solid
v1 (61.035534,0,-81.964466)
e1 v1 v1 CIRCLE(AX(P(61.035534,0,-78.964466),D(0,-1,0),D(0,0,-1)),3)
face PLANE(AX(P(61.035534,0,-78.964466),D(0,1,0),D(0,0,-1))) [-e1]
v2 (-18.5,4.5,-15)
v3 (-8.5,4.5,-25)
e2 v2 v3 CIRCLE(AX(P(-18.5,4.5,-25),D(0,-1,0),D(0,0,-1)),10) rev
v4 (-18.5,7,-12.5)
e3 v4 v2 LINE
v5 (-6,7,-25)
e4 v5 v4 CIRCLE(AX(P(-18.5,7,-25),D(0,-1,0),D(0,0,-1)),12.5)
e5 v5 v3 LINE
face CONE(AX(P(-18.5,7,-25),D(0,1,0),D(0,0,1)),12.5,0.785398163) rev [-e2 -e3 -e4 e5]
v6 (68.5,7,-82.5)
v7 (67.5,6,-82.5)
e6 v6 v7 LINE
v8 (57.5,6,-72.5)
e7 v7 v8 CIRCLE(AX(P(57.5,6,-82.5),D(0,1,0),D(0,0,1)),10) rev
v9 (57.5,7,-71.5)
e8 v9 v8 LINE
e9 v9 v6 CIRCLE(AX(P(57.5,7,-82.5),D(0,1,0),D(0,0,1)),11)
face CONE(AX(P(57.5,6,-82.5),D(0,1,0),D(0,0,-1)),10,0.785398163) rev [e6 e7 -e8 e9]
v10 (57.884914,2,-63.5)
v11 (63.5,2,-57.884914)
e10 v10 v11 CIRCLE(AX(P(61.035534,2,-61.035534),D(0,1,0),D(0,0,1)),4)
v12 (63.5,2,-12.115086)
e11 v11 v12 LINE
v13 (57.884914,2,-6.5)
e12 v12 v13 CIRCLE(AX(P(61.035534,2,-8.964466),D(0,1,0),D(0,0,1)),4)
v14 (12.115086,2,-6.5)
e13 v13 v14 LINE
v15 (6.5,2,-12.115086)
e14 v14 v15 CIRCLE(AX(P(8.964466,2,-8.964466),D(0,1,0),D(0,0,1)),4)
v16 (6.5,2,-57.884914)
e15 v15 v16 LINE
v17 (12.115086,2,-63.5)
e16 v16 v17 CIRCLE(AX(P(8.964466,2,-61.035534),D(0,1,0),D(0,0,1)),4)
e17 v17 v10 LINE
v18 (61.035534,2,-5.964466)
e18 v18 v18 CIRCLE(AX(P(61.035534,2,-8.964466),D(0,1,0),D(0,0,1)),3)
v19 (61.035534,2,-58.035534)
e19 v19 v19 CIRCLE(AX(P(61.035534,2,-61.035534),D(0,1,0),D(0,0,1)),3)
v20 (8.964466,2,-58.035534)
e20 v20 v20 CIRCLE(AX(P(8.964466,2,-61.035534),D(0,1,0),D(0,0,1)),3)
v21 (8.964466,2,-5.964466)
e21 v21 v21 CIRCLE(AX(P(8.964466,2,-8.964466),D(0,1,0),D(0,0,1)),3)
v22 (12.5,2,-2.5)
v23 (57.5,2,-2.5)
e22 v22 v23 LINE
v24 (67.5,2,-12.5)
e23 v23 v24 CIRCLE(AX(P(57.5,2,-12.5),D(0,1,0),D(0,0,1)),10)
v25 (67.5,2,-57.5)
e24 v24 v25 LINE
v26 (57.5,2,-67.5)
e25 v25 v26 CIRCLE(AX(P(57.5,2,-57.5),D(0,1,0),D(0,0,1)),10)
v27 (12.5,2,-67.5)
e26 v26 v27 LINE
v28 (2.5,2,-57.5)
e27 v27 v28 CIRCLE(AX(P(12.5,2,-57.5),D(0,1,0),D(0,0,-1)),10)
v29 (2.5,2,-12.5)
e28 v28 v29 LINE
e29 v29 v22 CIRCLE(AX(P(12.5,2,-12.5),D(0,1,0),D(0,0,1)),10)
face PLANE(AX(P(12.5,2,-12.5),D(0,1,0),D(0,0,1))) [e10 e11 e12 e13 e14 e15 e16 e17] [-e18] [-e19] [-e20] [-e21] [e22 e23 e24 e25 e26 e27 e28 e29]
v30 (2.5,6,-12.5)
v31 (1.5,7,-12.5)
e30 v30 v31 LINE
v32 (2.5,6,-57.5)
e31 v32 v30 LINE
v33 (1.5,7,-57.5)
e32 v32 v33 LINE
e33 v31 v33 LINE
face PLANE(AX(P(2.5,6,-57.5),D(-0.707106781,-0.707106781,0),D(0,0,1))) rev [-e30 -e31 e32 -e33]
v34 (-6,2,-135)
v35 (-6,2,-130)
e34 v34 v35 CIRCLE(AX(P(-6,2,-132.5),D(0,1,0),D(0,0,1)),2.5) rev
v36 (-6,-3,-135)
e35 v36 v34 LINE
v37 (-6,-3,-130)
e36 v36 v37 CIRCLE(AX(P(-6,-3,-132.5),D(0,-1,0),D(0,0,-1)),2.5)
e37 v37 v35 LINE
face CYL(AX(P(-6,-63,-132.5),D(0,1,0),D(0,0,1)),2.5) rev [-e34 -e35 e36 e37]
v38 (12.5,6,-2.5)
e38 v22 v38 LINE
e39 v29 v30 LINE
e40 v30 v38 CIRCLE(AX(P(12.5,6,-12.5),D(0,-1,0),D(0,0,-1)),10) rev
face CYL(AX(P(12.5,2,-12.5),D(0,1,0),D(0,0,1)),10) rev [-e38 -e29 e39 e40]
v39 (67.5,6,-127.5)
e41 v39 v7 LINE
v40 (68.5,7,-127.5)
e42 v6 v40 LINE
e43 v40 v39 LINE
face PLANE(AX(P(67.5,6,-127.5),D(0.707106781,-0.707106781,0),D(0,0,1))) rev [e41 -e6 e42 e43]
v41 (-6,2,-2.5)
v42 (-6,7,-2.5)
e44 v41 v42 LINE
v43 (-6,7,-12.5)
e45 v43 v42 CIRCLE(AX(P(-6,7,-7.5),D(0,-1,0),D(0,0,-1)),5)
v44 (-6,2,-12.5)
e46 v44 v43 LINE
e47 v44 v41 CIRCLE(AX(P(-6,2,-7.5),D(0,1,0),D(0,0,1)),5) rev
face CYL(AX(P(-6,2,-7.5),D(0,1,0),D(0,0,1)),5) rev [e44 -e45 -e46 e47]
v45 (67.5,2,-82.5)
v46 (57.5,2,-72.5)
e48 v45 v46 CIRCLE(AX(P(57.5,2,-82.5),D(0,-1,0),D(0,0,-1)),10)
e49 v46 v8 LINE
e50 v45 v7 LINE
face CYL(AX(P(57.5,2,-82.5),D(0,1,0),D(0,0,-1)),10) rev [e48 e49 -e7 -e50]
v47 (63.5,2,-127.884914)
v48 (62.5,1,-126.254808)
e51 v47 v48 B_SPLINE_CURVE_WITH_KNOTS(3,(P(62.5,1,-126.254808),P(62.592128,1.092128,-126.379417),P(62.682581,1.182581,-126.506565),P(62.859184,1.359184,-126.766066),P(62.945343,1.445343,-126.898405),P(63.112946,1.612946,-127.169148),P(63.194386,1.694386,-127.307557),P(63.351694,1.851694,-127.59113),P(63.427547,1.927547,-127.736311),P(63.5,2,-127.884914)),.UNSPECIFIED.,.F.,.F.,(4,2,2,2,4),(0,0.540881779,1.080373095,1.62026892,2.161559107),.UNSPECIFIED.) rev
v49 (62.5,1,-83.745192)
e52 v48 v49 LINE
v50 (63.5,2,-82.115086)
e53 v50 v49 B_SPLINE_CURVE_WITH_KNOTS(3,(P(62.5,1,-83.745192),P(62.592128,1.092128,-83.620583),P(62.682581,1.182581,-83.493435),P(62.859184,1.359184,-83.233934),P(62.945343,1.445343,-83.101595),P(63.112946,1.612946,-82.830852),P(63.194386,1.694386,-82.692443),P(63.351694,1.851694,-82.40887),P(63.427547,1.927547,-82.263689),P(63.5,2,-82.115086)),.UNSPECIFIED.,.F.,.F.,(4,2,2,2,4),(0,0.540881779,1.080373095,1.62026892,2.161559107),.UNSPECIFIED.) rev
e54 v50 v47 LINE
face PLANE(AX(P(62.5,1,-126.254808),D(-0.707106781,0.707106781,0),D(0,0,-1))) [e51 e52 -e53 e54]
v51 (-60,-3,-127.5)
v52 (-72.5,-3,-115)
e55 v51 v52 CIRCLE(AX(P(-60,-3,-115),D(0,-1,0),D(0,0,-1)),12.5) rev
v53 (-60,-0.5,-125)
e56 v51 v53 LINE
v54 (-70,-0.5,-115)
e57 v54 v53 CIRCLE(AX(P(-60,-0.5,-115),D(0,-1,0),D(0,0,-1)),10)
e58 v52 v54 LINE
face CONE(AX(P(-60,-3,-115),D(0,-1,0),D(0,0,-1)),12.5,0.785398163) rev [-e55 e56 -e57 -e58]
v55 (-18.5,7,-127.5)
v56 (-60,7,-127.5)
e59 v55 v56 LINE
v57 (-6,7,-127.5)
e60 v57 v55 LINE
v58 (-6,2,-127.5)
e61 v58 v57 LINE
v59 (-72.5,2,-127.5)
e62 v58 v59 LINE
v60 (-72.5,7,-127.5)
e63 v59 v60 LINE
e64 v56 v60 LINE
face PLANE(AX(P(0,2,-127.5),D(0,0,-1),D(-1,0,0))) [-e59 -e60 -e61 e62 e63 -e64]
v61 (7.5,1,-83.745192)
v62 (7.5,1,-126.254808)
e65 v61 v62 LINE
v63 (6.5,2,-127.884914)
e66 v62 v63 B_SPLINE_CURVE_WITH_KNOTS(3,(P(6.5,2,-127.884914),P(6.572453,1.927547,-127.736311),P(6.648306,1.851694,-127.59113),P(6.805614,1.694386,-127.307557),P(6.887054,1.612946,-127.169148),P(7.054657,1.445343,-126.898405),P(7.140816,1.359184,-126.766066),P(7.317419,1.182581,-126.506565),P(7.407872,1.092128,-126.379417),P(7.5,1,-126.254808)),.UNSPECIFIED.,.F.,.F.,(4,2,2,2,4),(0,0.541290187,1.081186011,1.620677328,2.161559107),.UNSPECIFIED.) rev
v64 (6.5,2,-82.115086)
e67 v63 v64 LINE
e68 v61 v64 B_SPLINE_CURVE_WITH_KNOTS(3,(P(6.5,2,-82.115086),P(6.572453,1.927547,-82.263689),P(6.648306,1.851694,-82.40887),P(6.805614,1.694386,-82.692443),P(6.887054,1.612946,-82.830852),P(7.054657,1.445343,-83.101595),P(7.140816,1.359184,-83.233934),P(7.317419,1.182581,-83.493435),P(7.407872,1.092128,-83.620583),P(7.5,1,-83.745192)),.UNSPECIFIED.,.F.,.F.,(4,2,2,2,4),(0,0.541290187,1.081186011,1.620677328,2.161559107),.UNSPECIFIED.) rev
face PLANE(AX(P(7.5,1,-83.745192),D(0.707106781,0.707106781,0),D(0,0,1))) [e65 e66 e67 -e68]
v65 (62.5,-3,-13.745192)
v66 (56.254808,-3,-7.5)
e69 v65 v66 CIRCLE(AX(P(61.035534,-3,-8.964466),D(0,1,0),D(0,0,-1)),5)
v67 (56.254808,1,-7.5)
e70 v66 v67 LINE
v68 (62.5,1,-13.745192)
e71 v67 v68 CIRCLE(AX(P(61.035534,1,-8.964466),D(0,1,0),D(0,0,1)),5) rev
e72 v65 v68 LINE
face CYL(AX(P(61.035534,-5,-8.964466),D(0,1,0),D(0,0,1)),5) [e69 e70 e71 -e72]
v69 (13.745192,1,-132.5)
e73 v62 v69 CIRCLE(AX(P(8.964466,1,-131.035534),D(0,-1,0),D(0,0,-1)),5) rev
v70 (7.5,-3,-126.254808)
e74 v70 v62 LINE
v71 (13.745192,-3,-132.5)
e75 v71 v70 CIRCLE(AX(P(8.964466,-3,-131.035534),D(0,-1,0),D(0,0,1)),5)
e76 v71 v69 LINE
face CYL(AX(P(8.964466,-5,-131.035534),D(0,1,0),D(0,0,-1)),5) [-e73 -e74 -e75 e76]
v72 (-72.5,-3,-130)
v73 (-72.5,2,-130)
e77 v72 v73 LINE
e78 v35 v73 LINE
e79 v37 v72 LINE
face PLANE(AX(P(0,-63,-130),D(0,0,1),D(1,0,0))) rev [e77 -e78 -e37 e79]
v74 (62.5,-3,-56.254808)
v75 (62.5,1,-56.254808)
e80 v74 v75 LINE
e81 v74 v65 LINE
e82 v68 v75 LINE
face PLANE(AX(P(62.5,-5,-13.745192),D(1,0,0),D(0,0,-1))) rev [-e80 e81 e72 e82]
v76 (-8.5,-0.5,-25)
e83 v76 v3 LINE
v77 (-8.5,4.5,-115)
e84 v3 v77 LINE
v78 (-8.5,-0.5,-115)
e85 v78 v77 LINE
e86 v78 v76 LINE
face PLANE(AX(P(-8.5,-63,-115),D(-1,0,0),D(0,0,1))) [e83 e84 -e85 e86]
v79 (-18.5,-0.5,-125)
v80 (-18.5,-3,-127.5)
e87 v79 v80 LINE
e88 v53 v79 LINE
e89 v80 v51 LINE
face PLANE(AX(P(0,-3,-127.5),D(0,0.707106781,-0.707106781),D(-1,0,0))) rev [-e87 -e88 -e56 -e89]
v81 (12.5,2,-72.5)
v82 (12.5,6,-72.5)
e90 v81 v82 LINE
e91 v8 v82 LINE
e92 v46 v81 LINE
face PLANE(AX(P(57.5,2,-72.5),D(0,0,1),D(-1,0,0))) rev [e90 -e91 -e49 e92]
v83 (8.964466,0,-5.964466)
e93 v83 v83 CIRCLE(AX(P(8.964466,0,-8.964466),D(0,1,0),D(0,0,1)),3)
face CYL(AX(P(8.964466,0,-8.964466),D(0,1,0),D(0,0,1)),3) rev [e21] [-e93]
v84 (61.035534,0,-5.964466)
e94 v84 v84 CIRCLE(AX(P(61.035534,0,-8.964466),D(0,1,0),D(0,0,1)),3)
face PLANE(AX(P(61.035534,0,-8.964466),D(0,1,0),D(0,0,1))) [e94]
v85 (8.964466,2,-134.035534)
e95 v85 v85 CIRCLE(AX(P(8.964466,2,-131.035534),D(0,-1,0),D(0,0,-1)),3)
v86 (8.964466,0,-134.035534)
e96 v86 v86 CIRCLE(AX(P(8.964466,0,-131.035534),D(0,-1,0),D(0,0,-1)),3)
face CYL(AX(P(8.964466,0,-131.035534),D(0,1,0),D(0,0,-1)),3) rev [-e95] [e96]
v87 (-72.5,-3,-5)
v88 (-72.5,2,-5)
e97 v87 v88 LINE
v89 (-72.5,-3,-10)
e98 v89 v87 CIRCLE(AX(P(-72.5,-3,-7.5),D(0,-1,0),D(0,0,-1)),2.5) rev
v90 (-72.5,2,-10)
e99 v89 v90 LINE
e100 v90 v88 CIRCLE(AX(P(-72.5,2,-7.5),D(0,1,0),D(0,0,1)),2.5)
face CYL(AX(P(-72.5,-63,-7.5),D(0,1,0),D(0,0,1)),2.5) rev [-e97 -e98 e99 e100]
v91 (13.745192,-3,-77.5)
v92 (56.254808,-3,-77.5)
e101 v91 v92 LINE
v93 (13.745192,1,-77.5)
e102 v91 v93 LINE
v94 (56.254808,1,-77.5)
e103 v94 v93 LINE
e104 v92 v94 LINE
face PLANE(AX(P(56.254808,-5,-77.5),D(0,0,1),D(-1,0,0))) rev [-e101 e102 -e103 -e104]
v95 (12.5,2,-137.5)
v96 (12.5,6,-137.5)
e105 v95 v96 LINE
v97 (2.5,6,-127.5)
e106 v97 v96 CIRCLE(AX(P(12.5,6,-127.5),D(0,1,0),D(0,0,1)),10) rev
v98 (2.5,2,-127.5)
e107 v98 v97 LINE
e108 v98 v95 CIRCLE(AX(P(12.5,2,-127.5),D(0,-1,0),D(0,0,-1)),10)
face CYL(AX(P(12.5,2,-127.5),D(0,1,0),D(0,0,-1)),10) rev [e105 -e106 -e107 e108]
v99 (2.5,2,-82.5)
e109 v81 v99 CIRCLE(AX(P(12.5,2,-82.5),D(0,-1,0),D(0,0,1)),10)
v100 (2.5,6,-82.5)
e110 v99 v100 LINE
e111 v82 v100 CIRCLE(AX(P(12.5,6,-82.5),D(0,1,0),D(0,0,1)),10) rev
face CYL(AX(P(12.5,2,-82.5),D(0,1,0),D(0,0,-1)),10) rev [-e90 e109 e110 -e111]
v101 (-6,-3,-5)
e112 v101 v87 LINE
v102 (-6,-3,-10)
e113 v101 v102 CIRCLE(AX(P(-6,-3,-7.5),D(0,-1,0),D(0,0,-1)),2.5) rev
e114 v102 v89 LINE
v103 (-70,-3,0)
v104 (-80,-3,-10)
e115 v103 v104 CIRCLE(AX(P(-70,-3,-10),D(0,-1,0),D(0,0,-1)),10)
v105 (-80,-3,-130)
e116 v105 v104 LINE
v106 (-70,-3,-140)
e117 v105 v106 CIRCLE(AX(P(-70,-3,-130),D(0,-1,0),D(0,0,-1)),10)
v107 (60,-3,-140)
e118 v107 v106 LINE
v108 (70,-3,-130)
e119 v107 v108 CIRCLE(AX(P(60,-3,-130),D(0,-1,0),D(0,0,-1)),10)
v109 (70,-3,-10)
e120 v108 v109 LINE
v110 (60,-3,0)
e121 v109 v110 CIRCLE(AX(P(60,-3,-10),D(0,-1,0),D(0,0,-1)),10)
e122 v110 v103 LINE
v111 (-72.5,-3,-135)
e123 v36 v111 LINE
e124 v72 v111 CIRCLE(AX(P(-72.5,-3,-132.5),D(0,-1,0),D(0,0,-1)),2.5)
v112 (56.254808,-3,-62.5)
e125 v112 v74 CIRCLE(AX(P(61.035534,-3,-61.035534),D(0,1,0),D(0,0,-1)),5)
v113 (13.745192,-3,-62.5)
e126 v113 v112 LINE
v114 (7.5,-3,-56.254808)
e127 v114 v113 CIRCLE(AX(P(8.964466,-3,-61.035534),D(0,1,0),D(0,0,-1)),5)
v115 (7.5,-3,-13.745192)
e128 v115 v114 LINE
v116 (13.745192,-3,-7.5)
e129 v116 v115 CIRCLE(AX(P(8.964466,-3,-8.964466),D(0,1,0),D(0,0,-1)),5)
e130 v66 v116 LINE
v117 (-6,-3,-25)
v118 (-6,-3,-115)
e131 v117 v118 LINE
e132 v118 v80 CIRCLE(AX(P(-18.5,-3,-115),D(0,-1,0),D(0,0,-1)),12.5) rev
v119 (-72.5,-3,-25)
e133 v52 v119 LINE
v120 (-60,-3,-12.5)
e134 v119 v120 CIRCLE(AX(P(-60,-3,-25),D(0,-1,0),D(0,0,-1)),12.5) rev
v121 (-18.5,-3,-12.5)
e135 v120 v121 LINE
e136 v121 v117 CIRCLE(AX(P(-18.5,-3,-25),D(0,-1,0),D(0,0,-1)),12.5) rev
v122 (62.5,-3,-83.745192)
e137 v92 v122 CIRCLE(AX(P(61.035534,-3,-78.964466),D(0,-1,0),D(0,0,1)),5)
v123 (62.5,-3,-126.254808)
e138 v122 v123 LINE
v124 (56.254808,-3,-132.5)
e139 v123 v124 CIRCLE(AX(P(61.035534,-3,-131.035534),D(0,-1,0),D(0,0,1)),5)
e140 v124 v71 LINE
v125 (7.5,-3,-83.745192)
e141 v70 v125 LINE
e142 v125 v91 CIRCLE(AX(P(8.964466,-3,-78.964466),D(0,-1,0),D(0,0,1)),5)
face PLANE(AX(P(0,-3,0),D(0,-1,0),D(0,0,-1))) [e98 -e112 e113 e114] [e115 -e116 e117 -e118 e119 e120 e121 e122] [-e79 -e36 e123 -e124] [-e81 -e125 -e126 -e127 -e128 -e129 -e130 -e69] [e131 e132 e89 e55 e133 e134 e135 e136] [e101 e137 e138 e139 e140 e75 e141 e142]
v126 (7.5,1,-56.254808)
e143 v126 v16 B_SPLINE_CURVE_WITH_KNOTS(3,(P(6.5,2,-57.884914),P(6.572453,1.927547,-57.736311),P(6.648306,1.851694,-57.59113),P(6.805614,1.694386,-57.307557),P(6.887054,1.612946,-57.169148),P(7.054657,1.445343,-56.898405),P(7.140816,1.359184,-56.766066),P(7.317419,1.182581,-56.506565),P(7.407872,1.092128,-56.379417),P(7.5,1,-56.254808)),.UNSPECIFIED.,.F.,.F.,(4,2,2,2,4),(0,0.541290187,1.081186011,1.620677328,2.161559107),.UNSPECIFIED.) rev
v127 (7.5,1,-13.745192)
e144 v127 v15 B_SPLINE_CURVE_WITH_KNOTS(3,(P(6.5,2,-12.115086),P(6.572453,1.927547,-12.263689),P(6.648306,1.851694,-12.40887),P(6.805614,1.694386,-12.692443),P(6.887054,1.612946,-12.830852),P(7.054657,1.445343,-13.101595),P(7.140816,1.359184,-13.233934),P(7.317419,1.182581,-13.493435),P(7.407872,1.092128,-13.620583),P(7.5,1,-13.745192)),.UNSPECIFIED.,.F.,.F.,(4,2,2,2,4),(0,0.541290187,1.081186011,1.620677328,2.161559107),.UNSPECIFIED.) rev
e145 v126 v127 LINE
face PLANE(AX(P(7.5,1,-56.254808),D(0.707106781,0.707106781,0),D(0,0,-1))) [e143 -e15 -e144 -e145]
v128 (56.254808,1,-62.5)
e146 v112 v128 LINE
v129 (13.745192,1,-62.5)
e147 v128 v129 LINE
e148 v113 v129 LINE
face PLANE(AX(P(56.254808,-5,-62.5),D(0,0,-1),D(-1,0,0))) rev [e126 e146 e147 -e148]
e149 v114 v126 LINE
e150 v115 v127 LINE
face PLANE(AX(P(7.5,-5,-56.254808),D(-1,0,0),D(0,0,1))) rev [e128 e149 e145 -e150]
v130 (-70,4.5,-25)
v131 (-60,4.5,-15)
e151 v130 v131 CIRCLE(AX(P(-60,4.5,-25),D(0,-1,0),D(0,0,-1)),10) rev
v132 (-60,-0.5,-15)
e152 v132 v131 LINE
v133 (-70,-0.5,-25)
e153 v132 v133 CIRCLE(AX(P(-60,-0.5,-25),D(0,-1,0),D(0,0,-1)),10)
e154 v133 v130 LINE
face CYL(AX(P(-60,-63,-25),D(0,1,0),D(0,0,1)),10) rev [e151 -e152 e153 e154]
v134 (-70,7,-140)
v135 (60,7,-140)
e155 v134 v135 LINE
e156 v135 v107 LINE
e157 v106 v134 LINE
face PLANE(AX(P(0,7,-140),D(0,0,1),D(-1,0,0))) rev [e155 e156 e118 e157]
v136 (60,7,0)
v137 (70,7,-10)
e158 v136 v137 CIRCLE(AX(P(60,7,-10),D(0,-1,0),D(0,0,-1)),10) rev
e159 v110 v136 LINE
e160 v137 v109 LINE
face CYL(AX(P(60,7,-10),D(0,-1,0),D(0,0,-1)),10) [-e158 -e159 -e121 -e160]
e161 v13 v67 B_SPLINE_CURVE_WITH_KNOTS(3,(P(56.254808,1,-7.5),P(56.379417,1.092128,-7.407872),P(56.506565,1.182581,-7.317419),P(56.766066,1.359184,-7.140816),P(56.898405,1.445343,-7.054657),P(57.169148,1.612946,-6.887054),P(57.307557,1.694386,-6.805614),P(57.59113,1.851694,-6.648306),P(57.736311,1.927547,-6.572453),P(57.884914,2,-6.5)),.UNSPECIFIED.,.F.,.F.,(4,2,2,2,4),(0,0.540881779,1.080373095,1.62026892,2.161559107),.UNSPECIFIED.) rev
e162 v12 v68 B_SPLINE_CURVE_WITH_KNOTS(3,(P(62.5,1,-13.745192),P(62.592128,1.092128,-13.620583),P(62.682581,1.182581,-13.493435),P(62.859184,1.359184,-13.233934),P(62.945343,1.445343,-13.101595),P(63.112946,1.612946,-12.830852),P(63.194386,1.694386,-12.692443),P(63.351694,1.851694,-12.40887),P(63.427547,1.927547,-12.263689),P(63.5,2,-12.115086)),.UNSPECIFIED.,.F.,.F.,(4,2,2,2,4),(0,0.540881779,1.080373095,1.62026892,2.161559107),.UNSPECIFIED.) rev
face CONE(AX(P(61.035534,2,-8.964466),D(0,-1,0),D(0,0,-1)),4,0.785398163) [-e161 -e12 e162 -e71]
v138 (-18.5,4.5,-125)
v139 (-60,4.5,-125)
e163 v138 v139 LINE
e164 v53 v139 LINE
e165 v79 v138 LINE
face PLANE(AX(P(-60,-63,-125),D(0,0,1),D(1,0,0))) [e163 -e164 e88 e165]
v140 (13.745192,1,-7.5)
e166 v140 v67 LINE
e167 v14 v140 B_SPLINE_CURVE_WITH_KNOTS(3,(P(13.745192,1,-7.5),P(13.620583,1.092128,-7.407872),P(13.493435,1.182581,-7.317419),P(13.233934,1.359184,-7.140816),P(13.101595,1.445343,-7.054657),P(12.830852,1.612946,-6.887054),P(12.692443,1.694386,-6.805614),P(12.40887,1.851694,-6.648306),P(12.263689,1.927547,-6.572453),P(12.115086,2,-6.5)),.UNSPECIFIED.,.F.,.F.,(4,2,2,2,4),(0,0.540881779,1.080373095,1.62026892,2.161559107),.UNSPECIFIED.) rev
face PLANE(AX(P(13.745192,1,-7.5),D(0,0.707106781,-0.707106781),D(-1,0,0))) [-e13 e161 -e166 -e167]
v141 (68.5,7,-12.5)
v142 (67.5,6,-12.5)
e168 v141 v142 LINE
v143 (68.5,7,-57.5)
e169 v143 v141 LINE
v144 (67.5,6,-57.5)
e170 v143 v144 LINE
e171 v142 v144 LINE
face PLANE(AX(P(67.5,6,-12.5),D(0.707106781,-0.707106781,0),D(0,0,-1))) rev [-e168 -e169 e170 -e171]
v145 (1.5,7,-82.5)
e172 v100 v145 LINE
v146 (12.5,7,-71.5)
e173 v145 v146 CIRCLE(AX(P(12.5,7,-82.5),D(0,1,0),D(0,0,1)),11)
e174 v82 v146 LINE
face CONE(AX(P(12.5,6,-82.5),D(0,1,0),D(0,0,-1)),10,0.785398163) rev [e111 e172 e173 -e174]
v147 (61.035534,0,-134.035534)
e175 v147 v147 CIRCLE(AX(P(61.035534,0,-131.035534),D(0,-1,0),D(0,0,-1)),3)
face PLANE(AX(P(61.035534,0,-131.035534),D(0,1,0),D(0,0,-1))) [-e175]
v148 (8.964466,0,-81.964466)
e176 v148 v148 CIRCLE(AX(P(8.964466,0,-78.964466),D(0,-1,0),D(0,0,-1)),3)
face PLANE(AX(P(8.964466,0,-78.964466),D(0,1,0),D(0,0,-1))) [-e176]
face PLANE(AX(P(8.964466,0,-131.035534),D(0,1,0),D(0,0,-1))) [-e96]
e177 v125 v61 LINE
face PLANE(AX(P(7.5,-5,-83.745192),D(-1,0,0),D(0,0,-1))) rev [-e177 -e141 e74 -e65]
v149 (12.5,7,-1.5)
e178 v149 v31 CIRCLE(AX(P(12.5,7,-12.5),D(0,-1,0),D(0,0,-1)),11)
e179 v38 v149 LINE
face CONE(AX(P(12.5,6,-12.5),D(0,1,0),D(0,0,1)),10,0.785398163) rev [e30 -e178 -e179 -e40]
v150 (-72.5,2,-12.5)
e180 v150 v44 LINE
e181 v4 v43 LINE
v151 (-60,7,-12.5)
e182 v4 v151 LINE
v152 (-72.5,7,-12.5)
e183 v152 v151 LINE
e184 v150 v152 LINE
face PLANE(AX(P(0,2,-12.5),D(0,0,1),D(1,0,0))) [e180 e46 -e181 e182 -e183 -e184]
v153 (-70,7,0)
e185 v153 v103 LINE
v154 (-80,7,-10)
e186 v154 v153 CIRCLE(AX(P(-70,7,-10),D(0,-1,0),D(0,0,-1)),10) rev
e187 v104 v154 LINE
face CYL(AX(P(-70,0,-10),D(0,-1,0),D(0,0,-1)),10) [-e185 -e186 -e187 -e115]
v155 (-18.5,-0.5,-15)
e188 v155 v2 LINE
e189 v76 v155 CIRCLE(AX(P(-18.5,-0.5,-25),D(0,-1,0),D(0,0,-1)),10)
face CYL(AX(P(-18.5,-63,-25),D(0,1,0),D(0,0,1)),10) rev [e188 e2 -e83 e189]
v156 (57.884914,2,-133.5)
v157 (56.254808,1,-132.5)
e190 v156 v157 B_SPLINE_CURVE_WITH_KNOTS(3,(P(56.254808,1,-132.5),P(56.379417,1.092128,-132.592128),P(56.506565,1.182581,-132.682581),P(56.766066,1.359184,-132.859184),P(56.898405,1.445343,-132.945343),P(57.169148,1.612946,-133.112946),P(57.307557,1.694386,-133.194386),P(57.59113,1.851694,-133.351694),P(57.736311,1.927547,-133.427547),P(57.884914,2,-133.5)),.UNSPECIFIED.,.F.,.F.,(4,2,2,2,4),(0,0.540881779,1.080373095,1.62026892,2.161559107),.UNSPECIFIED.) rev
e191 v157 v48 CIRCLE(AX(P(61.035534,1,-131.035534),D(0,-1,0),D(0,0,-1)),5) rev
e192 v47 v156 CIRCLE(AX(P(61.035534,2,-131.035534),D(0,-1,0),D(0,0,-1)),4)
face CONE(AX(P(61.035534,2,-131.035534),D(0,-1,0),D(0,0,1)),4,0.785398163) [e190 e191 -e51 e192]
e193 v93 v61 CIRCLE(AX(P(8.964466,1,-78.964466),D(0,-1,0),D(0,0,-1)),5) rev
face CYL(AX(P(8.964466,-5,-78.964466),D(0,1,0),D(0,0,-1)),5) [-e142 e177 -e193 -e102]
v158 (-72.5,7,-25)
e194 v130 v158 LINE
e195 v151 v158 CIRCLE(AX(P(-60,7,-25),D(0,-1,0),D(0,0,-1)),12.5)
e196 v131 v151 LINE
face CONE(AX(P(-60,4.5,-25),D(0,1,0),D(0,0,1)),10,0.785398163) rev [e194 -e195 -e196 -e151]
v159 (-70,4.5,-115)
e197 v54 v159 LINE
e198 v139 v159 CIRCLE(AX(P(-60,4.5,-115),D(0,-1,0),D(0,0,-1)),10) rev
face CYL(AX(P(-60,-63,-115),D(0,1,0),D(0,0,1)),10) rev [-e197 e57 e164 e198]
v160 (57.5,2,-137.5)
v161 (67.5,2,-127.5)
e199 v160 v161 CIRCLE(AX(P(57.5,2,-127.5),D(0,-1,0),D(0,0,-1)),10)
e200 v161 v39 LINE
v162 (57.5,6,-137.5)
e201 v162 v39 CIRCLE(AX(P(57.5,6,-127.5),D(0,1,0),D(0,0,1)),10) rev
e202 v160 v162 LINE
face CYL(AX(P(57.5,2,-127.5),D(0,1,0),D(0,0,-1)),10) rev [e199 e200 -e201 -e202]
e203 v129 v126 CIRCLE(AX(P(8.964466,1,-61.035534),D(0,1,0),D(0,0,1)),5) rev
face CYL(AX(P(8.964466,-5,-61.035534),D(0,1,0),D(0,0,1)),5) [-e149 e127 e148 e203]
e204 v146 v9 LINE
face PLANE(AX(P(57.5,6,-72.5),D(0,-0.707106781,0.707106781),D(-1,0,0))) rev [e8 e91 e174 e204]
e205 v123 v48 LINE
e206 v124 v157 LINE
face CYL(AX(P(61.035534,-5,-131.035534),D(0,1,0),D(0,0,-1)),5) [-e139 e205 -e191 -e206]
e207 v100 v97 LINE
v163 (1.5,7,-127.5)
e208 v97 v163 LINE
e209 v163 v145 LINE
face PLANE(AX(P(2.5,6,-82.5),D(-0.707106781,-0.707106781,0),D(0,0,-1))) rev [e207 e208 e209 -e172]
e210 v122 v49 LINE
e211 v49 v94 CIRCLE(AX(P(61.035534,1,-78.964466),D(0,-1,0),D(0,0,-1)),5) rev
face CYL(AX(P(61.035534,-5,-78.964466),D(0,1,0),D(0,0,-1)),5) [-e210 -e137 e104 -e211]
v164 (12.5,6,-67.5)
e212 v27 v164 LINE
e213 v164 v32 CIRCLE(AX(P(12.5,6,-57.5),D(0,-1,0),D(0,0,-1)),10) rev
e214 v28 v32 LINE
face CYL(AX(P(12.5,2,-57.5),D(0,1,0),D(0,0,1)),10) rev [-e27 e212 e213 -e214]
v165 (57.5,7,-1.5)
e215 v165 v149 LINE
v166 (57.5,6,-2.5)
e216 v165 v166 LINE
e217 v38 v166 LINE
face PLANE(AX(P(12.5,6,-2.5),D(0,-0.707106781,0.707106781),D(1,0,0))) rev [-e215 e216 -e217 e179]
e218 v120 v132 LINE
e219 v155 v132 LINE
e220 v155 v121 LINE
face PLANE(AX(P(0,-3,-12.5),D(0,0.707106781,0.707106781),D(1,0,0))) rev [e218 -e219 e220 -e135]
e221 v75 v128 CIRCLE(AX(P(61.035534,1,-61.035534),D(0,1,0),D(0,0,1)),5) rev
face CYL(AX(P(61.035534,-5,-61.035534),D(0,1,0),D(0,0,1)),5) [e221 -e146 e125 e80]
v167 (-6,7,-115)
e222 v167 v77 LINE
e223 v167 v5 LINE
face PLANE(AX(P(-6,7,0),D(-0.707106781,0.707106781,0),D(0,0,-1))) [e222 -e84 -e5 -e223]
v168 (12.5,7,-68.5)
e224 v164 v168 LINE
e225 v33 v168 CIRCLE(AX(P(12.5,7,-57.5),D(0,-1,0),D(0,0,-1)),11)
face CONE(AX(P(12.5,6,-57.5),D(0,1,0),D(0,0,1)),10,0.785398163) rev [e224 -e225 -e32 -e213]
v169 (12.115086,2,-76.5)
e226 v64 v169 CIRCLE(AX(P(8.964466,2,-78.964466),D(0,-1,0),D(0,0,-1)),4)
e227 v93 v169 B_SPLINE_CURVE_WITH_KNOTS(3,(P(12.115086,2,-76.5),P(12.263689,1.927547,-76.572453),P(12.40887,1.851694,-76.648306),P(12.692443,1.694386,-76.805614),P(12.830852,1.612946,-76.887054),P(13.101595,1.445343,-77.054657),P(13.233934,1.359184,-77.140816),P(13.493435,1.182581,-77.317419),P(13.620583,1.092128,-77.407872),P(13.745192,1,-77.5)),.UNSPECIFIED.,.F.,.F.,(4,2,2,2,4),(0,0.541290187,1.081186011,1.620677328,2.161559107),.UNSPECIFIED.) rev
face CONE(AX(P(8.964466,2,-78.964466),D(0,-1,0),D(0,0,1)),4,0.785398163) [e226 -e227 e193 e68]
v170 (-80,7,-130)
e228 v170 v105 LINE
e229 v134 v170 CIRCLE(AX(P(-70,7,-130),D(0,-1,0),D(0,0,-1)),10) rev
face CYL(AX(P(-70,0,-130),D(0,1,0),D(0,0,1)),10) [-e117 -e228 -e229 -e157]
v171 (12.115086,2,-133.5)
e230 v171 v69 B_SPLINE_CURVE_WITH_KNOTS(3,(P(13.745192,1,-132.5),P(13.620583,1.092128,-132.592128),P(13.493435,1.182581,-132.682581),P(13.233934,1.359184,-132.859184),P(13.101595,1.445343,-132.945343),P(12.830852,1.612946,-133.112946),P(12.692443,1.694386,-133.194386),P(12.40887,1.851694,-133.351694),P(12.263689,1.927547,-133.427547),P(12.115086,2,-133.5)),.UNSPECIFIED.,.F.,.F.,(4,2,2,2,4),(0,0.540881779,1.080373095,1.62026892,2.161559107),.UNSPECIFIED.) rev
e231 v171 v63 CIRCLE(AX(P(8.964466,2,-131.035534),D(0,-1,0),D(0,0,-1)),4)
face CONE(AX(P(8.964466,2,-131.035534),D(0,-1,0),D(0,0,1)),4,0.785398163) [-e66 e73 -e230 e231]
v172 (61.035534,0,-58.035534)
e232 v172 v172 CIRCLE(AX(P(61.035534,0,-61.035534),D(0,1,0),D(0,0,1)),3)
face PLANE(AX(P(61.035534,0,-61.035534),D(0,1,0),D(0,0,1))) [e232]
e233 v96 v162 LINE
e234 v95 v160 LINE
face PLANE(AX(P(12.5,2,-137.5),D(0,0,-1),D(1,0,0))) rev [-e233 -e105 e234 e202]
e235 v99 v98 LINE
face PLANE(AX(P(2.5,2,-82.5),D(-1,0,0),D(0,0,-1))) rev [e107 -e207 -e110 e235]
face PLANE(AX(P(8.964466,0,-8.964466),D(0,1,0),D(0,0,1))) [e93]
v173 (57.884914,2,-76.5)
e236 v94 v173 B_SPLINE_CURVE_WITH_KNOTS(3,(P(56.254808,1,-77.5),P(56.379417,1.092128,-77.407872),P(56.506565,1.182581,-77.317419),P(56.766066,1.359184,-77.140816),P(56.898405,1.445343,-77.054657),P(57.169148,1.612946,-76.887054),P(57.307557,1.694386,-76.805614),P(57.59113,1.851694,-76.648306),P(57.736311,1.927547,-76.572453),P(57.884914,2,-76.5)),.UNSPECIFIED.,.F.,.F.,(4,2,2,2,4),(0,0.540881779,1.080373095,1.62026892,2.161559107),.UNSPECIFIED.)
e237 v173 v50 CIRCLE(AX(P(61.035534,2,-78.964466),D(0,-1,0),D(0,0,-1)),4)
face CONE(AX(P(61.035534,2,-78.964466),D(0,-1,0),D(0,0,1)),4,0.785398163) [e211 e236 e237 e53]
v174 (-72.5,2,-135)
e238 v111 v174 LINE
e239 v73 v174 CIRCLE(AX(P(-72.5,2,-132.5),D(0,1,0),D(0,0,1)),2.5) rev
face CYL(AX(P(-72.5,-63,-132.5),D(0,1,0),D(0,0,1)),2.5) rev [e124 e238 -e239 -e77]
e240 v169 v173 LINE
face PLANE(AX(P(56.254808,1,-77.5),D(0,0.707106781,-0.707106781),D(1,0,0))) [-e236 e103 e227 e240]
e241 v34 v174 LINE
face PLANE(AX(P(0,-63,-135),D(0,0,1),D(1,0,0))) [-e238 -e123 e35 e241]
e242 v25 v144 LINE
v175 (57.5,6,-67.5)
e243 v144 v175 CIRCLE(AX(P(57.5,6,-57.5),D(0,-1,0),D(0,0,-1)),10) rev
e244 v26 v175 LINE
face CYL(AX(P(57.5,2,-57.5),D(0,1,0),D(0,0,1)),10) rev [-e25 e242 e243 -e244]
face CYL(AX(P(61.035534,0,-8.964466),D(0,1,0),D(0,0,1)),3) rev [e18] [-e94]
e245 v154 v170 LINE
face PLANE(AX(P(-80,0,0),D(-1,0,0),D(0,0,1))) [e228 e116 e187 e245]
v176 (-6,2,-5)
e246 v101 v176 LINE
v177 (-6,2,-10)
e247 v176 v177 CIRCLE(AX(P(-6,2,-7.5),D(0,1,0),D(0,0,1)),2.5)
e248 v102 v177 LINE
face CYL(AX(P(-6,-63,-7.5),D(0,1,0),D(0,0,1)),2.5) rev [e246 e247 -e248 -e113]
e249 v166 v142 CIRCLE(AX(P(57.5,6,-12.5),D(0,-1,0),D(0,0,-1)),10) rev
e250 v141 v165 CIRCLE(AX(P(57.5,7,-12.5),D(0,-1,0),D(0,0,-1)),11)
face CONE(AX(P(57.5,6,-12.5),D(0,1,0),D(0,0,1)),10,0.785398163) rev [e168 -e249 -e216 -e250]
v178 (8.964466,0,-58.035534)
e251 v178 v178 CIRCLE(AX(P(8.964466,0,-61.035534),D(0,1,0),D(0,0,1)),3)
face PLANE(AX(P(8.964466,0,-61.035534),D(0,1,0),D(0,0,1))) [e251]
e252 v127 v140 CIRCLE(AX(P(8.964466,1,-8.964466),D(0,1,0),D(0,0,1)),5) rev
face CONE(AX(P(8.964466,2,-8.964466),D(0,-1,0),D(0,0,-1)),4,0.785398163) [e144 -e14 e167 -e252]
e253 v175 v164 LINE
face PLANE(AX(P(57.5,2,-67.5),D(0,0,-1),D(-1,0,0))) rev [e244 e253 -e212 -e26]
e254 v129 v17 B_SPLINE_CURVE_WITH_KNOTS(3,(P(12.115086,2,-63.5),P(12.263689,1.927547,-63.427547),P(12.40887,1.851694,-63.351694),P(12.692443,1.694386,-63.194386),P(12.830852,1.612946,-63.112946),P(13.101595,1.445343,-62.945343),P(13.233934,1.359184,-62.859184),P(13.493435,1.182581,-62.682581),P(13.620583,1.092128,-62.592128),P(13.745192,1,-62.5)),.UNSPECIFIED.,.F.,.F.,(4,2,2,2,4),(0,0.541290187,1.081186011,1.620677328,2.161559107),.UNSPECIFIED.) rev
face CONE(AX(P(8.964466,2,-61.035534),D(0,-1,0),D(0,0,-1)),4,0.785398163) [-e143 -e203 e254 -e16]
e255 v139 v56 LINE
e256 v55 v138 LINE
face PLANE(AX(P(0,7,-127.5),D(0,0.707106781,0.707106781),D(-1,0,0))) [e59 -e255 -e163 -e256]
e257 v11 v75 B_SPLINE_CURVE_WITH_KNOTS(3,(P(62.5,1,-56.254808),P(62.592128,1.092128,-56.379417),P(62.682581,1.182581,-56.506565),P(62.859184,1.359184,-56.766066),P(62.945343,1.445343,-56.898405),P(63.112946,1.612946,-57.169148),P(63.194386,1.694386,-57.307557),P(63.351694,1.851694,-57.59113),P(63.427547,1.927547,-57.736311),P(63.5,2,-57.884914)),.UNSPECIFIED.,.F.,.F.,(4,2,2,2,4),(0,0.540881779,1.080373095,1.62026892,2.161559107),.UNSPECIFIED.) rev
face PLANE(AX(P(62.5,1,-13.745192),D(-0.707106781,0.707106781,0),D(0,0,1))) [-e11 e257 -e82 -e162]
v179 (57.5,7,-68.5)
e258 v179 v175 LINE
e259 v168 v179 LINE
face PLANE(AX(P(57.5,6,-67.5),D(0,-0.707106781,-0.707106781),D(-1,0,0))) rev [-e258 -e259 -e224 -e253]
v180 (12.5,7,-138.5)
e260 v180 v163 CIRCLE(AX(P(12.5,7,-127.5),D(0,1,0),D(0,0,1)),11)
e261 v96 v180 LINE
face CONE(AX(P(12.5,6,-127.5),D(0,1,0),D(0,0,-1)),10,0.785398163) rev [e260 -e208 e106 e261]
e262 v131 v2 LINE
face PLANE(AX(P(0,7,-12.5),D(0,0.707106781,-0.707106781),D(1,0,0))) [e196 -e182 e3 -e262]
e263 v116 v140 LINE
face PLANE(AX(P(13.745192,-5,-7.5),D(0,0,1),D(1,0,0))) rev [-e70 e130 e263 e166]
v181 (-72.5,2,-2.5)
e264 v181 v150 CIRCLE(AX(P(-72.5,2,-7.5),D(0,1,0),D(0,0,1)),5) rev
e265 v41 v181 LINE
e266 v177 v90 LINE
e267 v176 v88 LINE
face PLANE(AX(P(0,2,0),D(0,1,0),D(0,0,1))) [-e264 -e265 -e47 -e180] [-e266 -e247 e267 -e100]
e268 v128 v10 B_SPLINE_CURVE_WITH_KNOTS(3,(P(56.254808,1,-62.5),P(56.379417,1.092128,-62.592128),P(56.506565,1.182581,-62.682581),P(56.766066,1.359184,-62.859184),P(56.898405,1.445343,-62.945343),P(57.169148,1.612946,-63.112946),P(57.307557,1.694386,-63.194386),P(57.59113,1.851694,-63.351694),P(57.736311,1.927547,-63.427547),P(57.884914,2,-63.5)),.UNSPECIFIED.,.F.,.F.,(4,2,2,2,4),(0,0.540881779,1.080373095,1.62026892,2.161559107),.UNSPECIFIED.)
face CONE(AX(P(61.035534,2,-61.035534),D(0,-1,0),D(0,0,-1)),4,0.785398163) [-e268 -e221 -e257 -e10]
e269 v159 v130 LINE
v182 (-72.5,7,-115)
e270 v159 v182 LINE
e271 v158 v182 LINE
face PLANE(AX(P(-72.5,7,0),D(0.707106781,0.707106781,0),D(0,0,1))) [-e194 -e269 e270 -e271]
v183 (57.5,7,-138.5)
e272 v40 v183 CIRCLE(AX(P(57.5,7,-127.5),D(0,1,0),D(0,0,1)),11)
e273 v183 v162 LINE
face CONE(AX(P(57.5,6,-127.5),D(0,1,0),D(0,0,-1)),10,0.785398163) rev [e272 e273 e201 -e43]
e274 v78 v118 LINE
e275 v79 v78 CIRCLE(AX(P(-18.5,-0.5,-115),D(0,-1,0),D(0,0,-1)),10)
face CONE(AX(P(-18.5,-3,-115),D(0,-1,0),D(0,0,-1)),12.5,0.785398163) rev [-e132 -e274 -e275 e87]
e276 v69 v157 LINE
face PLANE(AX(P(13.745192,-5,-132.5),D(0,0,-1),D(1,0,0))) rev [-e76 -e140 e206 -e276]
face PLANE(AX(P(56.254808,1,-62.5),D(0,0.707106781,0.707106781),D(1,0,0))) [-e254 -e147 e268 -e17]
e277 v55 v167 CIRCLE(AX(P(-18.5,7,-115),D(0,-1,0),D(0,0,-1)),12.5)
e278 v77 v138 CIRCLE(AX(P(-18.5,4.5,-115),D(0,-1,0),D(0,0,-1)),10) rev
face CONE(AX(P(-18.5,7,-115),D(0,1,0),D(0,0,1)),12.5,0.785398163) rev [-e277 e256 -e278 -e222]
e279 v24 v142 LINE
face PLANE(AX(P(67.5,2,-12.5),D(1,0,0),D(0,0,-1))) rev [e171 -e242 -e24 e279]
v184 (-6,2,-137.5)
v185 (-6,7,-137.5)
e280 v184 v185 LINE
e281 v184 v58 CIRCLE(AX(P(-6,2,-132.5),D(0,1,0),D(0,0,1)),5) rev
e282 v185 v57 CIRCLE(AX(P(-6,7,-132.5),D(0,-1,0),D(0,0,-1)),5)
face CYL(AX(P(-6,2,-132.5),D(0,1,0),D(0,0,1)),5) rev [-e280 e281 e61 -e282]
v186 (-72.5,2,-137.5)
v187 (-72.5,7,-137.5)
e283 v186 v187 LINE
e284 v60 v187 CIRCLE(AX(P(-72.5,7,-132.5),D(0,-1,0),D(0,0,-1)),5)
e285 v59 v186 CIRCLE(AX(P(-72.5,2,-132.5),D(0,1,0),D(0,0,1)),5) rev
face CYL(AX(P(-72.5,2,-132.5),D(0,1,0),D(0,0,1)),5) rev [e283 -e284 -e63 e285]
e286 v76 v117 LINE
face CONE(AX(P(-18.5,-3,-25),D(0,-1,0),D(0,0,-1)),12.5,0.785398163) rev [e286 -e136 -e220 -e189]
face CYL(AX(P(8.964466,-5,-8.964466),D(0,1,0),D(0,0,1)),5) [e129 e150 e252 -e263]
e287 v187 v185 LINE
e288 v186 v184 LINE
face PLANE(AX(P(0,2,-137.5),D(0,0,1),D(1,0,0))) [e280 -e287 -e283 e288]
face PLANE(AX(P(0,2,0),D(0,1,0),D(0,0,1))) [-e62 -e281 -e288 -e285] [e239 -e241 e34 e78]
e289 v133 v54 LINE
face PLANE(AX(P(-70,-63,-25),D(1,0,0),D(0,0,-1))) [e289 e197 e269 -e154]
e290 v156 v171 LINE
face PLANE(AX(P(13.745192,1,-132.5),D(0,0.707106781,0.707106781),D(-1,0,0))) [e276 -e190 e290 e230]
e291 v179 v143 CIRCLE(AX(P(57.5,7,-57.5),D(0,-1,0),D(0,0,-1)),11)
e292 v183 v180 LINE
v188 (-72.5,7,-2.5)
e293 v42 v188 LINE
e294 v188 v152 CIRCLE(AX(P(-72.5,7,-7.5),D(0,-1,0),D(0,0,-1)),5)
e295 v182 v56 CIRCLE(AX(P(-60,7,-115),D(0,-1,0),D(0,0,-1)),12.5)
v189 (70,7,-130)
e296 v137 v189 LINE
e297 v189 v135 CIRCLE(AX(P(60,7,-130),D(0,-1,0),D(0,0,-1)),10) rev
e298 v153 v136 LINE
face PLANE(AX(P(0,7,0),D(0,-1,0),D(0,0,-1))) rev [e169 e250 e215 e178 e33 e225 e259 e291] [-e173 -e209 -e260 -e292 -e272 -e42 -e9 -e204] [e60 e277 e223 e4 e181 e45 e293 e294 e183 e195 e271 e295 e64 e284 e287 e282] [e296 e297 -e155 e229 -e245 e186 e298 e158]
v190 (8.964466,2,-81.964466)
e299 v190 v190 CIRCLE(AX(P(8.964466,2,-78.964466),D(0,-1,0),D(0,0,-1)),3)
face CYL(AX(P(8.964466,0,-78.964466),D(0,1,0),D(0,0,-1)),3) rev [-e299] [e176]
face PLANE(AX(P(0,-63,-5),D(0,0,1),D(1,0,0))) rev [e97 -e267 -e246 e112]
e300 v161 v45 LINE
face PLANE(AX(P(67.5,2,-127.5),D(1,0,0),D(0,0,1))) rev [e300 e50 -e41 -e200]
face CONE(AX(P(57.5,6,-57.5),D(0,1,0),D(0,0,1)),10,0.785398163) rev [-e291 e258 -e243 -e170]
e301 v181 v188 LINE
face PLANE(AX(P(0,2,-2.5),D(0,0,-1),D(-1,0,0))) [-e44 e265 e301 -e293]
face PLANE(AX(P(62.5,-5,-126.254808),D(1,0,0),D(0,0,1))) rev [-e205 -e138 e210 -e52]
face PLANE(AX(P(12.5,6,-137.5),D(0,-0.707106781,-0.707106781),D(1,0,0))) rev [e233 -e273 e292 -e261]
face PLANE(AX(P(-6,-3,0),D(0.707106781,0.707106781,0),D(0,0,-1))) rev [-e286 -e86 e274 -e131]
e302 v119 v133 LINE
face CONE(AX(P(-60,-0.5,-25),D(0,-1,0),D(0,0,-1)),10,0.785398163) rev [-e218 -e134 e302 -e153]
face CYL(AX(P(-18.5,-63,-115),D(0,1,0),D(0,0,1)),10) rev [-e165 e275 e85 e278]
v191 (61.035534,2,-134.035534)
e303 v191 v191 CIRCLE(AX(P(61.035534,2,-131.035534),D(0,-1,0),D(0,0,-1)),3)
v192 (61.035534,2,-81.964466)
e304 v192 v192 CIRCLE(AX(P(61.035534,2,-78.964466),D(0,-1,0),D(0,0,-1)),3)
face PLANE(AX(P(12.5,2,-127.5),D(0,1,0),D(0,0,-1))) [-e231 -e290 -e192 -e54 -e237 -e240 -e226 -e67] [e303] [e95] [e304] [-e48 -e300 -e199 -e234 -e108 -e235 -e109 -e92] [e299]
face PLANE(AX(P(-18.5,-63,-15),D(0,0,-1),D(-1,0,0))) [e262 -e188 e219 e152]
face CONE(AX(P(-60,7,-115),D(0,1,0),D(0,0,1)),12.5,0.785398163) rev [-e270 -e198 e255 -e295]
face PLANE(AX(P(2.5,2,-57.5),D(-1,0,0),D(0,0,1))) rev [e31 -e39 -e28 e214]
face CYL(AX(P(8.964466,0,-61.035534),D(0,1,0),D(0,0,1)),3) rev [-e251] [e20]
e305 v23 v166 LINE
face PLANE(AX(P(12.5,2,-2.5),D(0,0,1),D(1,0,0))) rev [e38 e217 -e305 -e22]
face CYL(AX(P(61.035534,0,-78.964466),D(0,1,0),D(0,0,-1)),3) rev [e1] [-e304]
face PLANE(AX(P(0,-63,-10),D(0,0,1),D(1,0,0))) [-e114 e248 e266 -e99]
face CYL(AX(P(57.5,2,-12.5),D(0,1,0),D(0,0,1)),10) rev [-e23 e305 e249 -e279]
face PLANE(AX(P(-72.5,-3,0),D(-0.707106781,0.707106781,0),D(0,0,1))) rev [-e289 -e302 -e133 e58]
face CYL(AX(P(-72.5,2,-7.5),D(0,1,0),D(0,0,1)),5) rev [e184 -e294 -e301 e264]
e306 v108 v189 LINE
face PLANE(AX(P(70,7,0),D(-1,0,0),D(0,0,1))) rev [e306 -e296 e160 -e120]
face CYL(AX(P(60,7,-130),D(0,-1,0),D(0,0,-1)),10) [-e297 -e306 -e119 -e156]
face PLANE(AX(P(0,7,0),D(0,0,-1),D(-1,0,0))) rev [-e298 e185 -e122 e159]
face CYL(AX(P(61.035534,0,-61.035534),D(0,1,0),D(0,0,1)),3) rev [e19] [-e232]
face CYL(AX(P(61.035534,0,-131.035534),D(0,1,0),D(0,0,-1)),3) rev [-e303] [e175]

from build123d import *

# Parameters (mm, degrees)
SKETCH1_W           = 70
SKETCH1_H           = 70
BOSS_EXTRUDE2_DEPTH = 7
CUT_EXTRUDE1_DEPTH  = 5
SKETCH9_W           = 70
SKETCH9_H           = 70
BOSS_EXTRUDE3_DEPTH = 5
CUT_EXTRUDE11_DEPTH = 100.242128151
SKETCH21_R          = 3
CUT_EXTRUDE12_DEPTH = 2
CHAMFER3_SIZE       = 1
CUT_EXTRUDE13_START = -2
SKETCH22_W          = 70
SKETCH22_H          = 70
CUT_EXTRUDE13_DEPTH = 2
FILLET1_R           = 10
SKETCH23_W          = 140
SKETCH23_H          = 10
BOSS_EXTRUDE4_DEPTH = 80
CUT_EXTRUDE14_DEPTH = 70
FILLET2_R           = 10
CUT_EXTRUDE15_DEPTH = 70
CHAMFER5_SIZE       = 2.5
CUT_EXTRUDE16_DEPTH = 5
CUT_EXTRUDE17_DEPTH = 5


with BuildPart() as part:
    # Sketch1 → Boss-Extrude2 (new body)
    with BuildSketch(Plane(origin=(0, 0, 0), x_dir=(1, 0, 0), z_dir=(0, 1, 0))):
        with Locations((35, 35)):
            Rectangle(SKETCH1_W, SKETCH1_H)
    extrude(amount=BOSS_EXTRUDE2_DEPTH)

    # Sketch3 → Cut-Extrude1 (cut)
    with BuildSketch(Plane(origin=(0, 7, 0), x_dir=(1, 0, 0), z_dir=(0, 1, 0))):
        with BuildLine():
            Line((2.5, 57.5), (2.5, 12.5))
            ThreePointArc((2.5, 12.5), (5.428932188, 5.428932188), (12.5, 2.5))
            Line((12.5, 2.5), (57.5, 2.5))
            ThreePointArc((57.5, 2.5), (64.571067812, 5.428932188), (67.5, 12.5))
            Line((67.5, 12.5), (67.5, 57.5))
            ThreePointArc((67.5, 57.5), (64.571067812, 64.571067812), (57.5, 67.5))
            Line((57.5, 67.5), (12.5, 67.5))
            ThreePointArc((12.5, 67.5), (5.428932188, 64.571067812), (2.5, 57.5))
        make_face()
    extrude(amount=-CUT_EXTRUDE1_DEPTH, mode=Mode.SUBTRACT)

    # Sketch9 → Boss-Extrude3 (add)
    with BuildSketch(Plane.XZ):
        with Locations((35, -35)):
            Rectangle(SKETCH9_W, SKETCH9_H)
    extrude(amount=BOSS_EXTRUDE3_DEPTH)

    # Sketch20 → Cut-Extrude11 (cut, through all)
    with BuildSketch(Plane(origin=(0, 2, 0), x_dir=(1, 0, 0), z_dir=(0, 1, 0))):
        with BuildLine():
            Line((13.745191882, 7.5), (56.254808118, 7.5))
            ThreePointArc((56.254808118, 7.5), (57.5, 12.5), (62.5, 13.745191882))
            Line((62.5, 13.745191882), (62.5, 56.254808118))
            ThreePointArc((62.5, 56.254808118), (57.5, 57.5), (56.254808118, 62.5))
            Line((56.254808118, 62.5), (13.745191882, 62.5))
            ThreePointArc((13.745191882, 62.5), (12.5, 57.5), (7.5, 56.254808118))
            Line((7.5, 56.254808118), (7.5, 13.745191882))
            ThreePointArc((7.5, 13.745191882), (12.5, 12.5), (13.745191882, 7.5))
        make_face()
    extrude(amount=-CUT_EXTRUDE11_DEPTH, mode=Mode.SUBTRACT)

    # Sketch21 → Cut-Extrude12 (cut)
    with BuildSketch(Plane(origin=(0, 2, 0), x_dir=(1, 0, 0), z_dir=(0, 1, 0))):
        with Locations(Location((8.964466094, 61.035533906, 0), (0, 0, 270))):
            Circle(SKETCH21_R)
        with Locations(Location((61.035533906, 61.035533906, 0), (0, 0, 270))):
            Circle(SKETCH21_R)
        with Locations(Location((61.035533906, 8.964466094, 0), (0, 0, 270))):
            Circle(SKETCH21_R)
        with Locations(Location((8.964466094, 8.964466094, 0), (0, 0, 270))):
            Circle(SKETCH21_R)
    extrude(amount=-CUT_EXTRUDE12_DEPTH, mode=Mode.SUBTRACT)

    # Chamfer3
    chamfer3_edges = [part.edges().sort_by_distance(p)[0] for p in [
        (5.428932188, 7, -5.428932188),
        (35, 7, -2.5),
        (64.571067812, 7, -5.428932188),
        (67.5, 7, -35),
        (64.571067812, 7, -64.571067812),
        (35, 7, -67.5),
        (5.428932188, 7, -64.571067812),
        (2.5, 7, -35),
        (12.5, 2, -12.5),
        (12.5, 2, -57.5),
        (57.5, 2, -57.5),
        (57.5, 2, -12.5),
        (35, 2, -7.5),
        (62.5, 2, -35),
        (35, 2, -62.5),
        (7.5, 2, -35),
    ]]
    chamfer(chamfer3_edges, length=CHAMFER3_SIZE)

    # Sketch22 → Cut-Extrude13 (cut)
    with BuildSketch(Plane.XZ.offset(5).offset(CUT_EXTRUDE13_START)):
        with Locations((35, -35)):
            Rectangle(SKETCH22_W, SKETCH22_H)
        with BuildLine():
            Line((7.5, -13.745191882), (7.5, -56.254808118))
            ThreePointArc((7.5, -56.254808118), (12.5, -57.5), (13.745191882, -62.5))
            Line((13.745191882, -62.5), (56.254808118, -62.5))
            ThreePointArc((56.254808118, -62.5), (57.5, -57.5), (62.5, -56.254808118))
            Line((62.5, -56.254808118), (62.5, -13.745191882))
            ThreePointArc((62.5, -13.745191882), (57.5, -12.5), (56.254808118, -7.5))
            Line((56.254808118, -7.5), (13.745191882, -7.5))
            ThreePointArc((13.745191882, -7.5), (12.5, -12.5), (7.5, -13.745191882))
        make_face(mode=Mode.SUBTRACT)
    extrude(amount=CUT_EXTRUDE13_DEPTH, mode=Mode.SUBTRACT)

    # Mirror2: part across plane


with BuildPart() as part_1:
    add(part.part)
    add(part.part.mirror(Plane(origin=(0, 7, -70), x_dir=(1, 0, 0), z_dir=(0, 0, 1))))

    # Fillet1
    fillet1_edges = [part_1.edges().sort_by_distance(p)[0] for p in [
        (70, 2, -140),
        (70, 2, 0),
    ]]
    fillet(fillet1_edges, radius=FILLET1_R)

    # Sketch23 → Boss-Extrude4 (add)
    with BuildSketch(Plane.ZY):
        with Locations((-70, 2)):
            Rectangle(SKETCH23_W, SKETCH23_H)
    extrude(amount=BOSS_EXTRUDE4_DEPTH)

    # Sketch24 → Cut-Extrude14 (cut)
    with BuildSketch(Plane(origin=(0, 7, 0), x_dir=(1, 0, 0), z_dir=(0, 1, 0))):
        with BuildLine():
            Line((-72.5, 5), (-6, 5))
            ThreePointArc((-6, 5), (-3.5, 7.5), (-6, 10))
            Line((-6, 10), (-72.5, 10))
            ThreePointArc((-72.5, 10), (-75, 7.5), (-72.5, 5))
        make_face()
        with BuildLine():
            Line((-72.5, 135), (-6, 135))
            ThreePointArc((-6, 135), (-3.5, 132.5), (-6, 130))
            Line((-6, 130), (-72.5, 130))
            ThreePointArc((-72.5, 130), (-75, 132.5), (-72.5, 135))
        make_face()
    extrude(amount=-CUT_EXTRUDE14_DEPTH, mode=Mode.SUBTRACT)

    # Fillet2
    fillet2_edges = [part_1.edges().sort_by_distance(p)[0] for p in [
        (-80, 2, -140),
        (-80, 2, 0),
    ]]
    fillet(fillet2_edges, radius=FILLET2_R)

    # Sketch25 → Cut-Extrude15 (cut)
    with BuildSketch(Plane(origin=(0, 7, 0), x_dir=(1, 0, 0), z_dir=(0, 1, 0))):
        with BuildLine():
            Line((-70, 25), (-70, 115))
            ThreePointArc((-70, 115), (-67.071067812, 122.071067812), (-60, 125))
            Line((-60, 125), (-18.5, 125))
            ThreePointArc((-18.5, 125), (-11.428932188, 122.071067812), (-8.5, 115))
            Line((-8.5, 115), (-8.5, 25))
            ThreePointArc((-8.5, 25), (-11.428932188, 17.928932188), (-18.5, 15))
            Line((-18.5, 15), (-60, 15))
            ThreePointArc((-60, 15), (-67.071067812, 17.928932188), (-70, 25))
        make_face()
    extrude(amount=-CUT_EXTRUDE15_DEPTH, mode=Mode.SUBTRACT)

    # Chamfer5
    chamfer5_edges = [part_1.edges().sort_by_distance(p)[0] for p in [
        (-3.5, 7, -7.5),
        (-75, 7, -7.5),
        (-39.25, 7, -10),
        (-39.25, 7, -5),
        (-39.25, 7, -135),
        (-39.25, 7, -130),
        (-3.5, 7, -132.5),
        (-75, 7, -132.5),
        (-67.071067812, -3, -17.928932188),
        (-39.25, -3, -15),
        (-11.428932188, -3, -17.928932188),
        (-8.5, -3, -70),
        (-11.428932188, -3, -122.071067812),
        (-39.25, -3, -125),
        (-67.071067812, -3, -122.071067812),
        (-70, -3, -70),
        (-70, 7, -70),
        (-67.071067812, 7, -122.071067812),
        (-39.25, 7, -125),
        (-11.428932188, 7, -122.071067812),
        (-8.5, 7, -70),
        (-11.428932188, 7, -17.928932188),
        (-39.25, 7, -15),
        (-67.071067812, 7, -17.928932188),
    ]]
    chamfer(chamfer5_edges, length=CHAMFER5_SIZE - 0.0001)  # a hair under: the kernel refuses the full size

    # Sketch26 → Cut-Extrude16 (cut)
    with BuildSketch(Plane(origin=(0, 7, 0), x_dir=(1, 0, 0), z_dir=(0, 1, 0))):
        with BuildLine():
            ThreePointArc((-72.5, 137.5), (-77.5, 132.5), (-72.5, 127.5))
            ThreePointArc((-72.5, 127.5), (-68.964466094, 128.964466094), (-67.5, 132.5))
            ThreePointArc((-67.5, 132.5), (-68.964466094, 136.035533906), (-72.5, 137.5))
        make_face()
        with BuildLine():
            ThreePointArc((-67.5, 132.5), (-68.964466094, 128.964466094), (-72.5, 127.5))
            Line((-72.5, 127.5), (-60, 127.5))
            Line((-60, 127.5), (-18.5, 127.5))
            Line((-18.5, 127.5), (-6, 127.5))
            ThreePointArc((-6, 127.5), (-11, 132.5), (-6, 137.5))
            Line((-6, 137.5), (-72.5, 137.5))
            ThreePointArc((-72.5, 137.5), (-68.964466094, 136.035533906), (-67.5, 132.5))
        make_face()
        with BuildLine():
            Line((-6, 127.5), (-6, 137.5))
            ThreePointArc((-6, 137.5), (-1, 132.5), (-6, 127.5))
        make_face()
        with BuildLine():
            ThreePointArc((-1, 132.5), (-2.464466094, 136.035533906), (-6, 137.5))
            Line((-6, 137.5), (-6, 127.5))
            ThreePointArc((-6, 127.5), (-2.464466094, 128.964466094), (-1, 132.5))
        make_face()
        with BuildLine():
            Line((-6, 127.5), (-6, 137.5))
            ThreePointArc((-6, 137.5), (-11, 132.5), (-6, 127.5))
        make_face()
    extrude(amount=-CUT_EXTRUDE16_DEPTH, mode=Mode.SUBTRACT)

    # Sketch27 → Cut-Extrude17 (cut)
    with BuildSketch(Plane(origin=(0, 7, 0), x_dir=(1, 0, 0), z_dir=(0, 1, 0))):
        with BuildLine():
            ThreePointArc((-6, 12.5), (-11, 7.5), (-6, 2.5))
            Line((-6, 2.5), (-6, 12.5))
        make_face()
        with BuildLine():
            Line((-6, 12.5), (-6, 2.5))
            ThreePointArc((-6, 2.5), (-2.464466094, 3.964466094), (-1, 7.5))
            ThreePointArc((-1, 7.5), (-2.464466094, 11.035533906), (-6, 12.5))
        make_face()
        with BuildLine():
            Line((-6, 12.5), (-6, 2.5))
            ThreePointArc((-6, 2.5), (-1, 7.5), (-6, 12.5))
        make_face()
        with BuildLine():
            Line((-60, 12.5), (-72.5, 12.5))
            ThreePointArc((-72.5, 12.5), (-68.964466094, 11.035533906), (-67.5, 7.5))
            ThreePointArc((-67.5, 7.5), (-68.964466094, 3.964466094), (-72.5, 2.5))
            Line((-72.5, 2.5), (-6, 2.5))
            ThreePointArc((-6, 2.5), (-11, 7.5), (-6, 12.5))
            Line((-6, 12.5), (-18.5, 12.5))
            Line((-18.5, 12.5), (-60, 12.5))
        make_face()
        with BuildLine():
            ThreePointArc((-67.5, 7.5), (-68.964466094, 11.035533906), (-72.5, 12.5))
            ThreePointArc((-72.5, 12.5), (-77.5, 7.5), (-72.5, 2.5))
            ThreePointArc((-72.5, 2.5), (-68.964466094, 3.964466094), (-67.5, 7.5))
        make_face()
    extrude(amount=-CUT_EXTRUDE17_DEPTH, mode=Mode.SUBTRACT)


solid = part_1.part
